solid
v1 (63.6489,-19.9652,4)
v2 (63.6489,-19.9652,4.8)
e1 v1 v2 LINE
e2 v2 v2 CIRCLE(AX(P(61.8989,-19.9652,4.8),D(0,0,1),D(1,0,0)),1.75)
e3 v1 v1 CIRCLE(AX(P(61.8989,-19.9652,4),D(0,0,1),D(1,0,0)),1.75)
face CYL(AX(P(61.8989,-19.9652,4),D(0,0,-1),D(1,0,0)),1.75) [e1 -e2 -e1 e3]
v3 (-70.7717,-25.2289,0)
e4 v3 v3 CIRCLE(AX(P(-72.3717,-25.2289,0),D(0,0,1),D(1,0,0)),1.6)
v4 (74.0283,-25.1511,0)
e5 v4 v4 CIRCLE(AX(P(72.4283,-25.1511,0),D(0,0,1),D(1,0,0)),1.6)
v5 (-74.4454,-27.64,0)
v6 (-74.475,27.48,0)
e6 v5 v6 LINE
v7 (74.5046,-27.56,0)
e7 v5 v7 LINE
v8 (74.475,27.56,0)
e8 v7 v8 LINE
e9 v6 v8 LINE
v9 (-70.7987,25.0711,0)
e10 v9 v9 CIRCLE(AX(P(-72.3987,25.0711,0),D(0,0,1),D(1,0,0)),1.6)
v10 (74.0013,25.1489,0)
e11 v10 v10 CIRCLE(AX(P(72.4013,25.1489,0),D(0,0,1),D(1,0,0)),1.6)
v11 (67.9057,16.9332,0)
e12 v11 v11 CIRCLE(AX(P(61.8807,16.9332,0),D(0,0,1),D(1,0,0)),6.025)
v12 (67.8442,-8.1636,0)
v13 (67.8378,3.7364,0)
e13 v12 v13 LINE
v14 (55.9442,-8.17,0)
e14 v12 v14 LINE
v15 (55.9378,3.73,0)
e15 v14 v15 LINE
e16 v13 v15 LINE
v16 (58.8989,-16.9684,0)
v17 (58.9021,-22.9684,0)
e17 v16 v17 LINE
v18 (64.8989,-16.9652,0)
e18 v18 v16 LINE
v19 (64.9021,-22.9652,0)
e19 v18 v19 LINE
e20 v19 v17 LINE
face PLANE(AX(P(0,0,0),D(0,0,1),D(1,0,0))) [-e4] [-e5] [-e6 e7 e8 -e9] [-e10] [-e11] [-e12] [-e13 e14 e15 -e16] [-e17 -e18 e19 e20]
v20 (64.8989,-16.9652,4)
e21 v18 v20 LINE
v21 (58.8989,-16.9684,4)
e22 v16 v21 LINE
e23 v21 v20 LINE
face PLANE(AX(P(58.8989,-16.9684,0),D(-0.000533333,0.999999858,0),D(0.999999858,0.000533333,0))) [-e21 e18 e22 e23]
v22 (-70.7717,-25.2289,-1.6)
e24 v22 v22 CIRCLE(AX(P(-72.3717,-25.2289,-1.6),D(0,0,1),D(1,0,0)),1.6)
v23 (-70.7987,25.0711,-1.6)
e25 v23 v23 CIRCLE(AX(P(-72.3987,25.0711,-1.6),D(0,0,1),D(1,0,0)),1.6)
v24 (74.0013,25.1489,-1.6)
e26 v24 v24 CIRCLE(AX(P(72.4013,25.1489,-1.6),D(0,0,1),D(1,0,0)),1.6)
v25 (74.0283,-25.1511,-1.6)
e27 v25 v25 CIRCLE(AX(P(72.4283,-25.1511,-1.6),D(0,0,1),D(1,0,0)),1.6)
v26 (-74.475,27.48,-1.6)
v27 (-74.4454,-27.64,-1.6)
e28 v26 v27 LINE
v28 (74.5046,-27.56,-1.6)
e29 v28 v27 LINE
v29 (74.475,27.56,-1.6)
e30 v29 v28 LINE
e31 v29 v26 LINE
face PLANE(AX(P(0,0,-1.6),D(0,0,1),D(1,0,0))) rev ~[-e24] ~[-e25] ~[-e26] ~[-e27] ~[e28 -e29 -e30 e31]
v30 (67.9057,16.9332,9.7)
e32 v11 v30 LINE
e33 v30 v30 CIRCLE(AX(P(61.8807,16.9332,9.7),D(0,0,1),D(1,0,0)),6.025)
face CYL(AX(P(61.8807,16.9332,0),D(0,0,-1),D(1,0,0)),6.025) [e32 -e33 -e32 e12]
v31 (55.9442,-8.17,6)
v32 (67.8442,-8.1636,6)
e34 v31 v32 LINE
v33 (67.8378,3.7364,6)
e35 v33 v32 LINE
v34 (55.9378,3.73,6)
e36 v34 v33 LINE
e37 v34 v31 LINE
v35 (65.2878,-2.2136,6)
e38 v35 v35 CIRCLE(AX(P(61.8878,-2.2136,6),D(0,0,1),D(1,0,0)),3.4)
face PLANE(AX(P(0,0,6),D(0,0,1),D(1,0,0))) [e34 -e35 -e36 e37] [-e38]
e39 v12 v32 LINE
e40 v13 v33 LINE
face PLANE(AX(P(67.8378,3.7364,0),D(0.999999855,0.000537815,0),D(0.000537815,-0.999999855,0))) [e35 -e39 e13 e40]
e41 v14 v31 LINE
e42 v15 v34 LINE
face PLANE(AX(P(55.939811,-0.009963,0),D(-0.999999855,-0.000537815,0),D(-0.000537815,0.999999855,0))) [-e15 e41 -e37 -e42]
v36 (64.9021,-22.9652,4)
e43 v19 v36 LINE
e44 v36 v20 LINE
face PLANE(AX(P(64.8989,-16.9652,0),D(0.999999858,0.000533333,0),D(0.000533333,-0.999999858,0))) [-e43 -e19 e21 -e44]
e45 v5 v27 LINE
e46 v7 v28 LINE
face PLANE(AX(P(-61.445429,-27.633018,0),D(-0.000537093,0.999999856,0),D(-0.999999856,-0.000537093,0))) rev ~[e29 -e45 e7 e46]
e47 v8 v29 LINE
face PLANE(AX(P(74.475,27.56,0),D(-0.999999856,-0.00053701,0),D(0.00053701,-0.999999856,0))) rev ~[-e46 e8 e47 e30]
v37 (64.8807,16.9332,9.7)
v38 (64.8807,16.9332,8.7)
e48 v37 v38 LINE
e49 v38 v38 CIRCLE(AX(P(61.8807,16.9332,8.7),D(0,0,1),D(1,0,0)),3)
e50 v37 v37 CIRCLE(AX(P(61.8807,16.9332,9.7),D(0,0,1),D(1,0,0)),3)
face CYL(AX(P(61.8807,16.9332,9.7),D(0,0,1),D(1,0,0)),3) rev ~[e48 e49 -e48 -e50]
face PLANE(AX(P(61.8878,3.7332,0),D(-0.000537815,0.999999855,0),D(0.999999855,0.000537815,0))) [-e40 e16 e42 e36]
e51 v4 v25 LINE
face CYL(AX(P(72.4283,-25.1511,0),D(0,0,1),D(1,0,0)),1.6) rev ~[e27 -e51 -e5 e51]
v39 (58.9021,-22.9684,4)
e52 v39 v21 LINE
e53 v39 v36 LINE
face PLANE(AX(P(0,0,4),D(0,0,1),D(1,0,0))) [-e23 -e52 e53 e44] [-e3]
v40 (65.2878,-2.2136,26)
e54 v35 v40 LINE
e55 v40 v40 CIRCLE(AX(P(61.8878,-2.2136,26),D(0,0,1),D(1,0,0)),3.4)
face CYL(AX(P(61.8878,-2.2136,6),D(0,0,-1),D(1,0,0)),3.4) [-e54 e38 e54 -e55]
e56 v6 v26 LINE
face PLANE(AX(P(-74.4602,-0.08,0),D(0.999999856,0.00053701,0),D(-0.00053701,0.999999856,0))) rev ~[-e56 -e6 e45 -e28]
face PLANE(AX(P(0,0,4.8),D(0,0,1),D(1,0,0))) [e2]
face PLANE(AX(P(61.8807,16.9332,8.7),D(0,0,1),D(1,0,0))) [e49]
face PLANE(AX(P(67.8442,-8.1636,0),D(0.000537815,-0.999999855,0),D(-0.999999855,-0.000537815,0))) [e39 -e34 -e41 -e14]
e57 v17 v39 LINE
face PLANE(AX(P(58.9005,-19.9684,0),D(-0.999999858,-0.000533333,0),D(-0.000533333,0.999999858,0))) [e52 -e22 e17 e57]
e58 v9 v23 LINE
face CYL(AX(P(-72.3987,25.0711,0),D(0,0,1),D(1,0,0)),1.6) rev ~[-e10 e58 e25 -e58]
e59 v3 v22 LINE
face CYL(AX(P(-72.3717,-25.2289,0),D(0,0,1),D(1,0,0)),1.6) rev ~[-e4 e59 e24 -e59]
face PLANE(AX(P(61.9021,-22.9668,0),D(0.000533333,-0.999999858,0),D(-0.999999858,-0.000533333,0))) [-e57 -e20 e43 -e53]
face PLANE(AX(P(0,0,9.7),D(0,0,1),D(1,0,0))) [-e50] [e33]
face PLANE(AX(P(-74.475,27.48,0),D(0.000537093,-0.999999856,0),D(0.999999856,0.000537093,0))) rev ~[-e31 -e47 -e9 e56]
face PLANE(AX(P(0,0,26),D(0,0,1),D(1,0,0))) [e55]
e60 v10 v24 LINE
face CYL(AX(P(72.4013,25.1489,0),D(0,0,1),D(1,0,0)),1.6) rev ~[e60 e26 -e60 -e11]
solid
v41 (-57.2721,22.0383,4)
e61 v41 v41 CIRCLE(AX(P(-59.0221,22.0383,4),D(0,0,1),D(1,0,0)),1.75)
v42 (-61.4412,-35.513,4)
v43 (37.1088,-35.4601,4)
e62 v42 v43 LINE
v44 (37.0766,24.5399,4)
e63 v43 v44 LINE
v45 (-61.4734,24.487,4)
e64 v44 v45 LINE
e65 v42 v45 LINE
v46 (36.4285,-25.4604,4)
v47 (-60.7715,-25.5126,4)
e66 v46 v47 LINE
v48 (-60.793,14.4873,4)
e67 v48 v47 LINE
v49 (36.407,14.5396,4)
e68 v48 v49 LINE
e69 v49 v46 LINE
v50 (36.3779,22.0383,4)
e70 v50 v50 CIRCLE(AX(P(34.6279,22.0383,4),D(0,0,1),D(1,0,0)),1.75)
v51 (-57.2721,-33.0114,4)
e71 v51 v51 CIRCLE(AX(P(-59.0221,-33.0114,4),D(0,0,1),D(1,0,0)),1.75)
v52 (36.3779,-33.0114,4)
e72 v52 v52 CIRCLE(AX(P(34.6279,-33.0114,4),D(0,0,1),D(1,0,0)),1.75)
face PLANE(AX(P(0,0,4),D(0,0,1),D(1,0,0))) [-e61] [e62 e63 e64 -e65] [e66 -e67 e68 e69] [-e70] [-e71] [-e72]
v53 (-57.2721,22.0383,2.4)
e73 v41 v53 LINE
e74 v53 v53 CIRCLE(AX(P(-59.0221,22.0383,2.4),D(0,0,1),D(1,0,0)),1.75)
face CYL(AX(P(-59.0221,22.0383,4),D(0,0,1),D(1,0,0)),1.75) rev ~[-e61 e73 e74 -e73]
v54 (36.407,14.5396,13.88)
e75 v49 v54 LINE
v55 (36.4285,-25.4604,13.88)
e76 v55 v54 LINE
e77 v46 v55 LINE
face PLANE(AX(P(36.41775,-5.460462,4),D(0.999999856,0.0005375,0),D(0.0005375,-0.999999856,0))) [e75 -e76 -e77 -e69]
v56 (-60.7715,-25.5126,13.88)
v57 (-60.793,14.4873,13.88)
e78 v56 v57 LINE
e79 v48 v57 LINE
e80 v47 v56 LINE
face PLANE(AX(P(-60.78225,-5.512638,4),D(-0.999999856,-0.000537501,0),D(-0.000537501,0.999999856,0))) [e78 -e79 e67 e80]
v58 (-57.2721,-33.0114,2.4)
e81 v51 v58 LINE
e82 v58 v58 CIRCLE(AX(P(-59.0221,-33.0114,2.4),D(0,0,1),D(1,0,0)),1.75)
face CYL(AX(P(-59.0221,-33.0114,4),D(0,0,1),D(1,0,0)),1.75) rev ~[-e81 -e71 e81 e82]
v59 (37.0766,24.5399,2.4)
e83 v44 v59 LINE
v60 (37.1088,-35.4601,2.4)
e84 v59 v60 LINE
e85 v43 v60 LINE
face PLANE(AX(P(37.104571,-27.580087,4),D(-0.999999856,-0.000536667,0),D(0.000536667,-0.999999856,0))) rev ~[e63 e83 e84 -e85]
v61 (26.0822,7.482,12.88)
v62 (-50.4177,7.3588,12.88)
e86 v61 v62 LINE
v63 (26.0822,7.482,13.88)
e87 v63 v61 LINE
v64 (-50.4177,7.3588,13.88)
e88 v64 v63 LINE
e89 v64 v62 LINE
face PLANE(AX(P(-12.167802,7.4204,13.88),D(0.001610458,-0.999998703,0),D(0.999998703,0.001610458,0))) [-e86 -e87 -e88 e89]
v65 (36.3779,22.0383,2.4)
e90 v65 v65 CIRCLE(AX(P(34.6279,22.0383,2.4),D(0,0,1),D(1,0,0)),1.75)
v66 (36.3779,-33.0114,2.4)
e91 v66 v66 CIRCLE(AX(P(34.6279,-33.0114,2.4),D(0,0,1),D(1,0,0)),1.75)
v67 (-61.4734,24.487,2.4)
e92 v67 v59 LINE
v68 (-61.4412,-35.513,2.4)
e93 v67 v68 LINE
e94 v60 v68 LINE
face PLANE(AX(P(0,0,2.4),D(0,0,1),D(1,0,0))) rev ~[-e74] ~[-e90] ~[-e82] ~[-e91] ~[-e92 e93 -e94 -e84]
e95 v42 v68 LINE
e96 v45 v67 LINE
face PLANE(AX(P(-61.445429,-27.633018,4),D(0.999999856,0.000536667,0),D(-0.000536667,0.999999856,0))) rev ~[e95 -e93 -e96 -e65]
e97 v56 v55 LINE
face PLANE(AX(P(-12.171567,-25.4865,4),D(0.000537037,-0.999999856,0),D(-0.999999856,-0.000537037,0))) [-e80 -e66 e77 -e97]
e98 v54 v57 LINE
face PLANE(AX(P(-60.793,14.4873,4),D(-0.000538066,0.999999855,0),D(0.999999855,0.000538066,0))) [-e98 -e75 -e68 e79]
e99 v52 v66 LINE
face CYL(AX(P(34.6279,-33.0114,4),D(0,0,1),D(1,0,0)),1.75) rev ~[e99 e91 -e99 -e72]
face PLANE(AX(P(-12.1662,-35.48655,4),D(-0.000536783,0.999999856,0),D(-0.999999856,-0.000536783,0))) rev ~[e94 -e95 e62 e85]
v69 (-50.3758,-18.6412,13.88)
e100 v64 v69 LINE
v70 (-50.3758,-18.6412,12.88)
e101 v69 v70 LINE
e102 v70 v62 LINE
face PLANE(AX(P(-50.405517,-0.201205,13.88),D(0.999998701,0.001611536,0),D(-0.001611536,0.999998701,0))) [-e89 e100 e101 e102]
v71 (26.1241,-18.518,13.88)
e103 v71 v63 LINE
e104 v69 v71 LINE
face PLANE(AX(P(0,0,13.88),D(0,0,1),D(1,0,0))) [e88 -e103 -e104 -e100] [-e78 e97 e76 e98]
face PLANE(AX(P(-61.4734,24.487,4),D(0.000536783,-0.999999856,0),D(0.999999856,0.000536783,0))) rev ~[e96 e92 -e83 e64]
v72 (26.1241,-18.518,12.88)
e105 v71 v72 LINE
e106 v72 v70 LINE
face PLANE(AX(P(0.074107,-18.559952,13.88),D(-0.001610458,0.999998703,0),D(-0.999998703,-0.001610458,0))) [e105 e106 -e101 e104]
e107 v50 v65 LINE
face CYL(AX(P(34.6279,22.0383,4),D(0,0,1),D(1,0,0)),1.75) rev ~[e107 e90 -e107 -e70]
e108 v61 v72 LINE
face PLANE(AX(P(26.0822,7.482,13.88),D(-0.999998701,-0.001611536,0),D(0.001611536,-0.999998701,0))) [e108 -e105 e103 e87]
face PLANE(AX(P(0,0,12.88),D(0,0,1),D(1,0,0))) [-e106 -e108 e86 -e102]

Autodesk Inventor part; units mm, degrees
ref_plane "YZ Plane" through (0, 0, 0) normal (1, 0, 0) x (0, 1, 0)
ref_plane "XZ Plane" through (0, 0, 0) normal (0, 1, 0) x (-1, 0, 0)
sketch "LCD Screen" plane through (0, 0, 0) normal (0, 0, 1) x (1, 0, 0)
  line L0 (-74.575, 27.52) -> (74.375, 27.52)
  line L1 (74.375, 27.52) -> (74.375, -27.6)
  line L2 (74.375, -27.6) -> (-74.575, -27.6)
  line L3 (-74.575, -27.6) -> (-74.575, 27.52)
  circle A0 centre (-72.5, 25.11) radius 1.6
  circle A1 centre (72.3, 25.11) radius 1.6
  circle A2 centre (72.3, -25.19) radius 1.6
  circle A3 centre (-72.5, -25.19) radius 1.6
  circle A4 centre (61.775, 16.9) radius 6.025
  line L4 (55.825, 3.7) -> (67.725, 3.7)
  line L5 (67.725, 3.7) -> (67.725, -8.2)
  line L6 (67.725, -8.2) -> (55.825, -8.2)
  line L7 (55.825, -8.2) -> (55.825, 3.7)
  line L8 (58.775, -17) -> (64.775, -17)
  line L9 (64.775, -17) -> (64.775, -23)
  line L10 (64.775, -23) -> (58.775, -23)
  line L11 (58.775, -23) -> (58.775, -17)
  line L12 (-61.575, 24.52) -> (36.975, 24.52)
  line L13 (36.975, 24.52) -> (36.975, -35.48)
  line L14 (36.975, -35.48) -> (-61.575, -35.48)
  line L15 (-61.575, -35.48) -> (-61.575, 24.52)
  line L16 (-60.9, 14.52) -> (36.3, 14.52)
  line L17 (36.3, 14.52) -> (36.3, -25.48)
  line L18 (36.3, -25.48) -> (-60.9, -25.48)
  line L19 (-60.9, -25.48) -> (-60.9, 14.52)
  line L20 (-50.55, 7.52) -> (25.95, 7.52)
  line L21 (25.95, 7.52) -> (25.95, -18.48)
  line L22 (25.95, -18.48) -> (-50.55, -18.48)
  line L23 (-50.55, -18.48) -> (-50.55, 7.52)
  line L24 (-74.575, -0.04) -> (74.375, -0.04)
  line L25 (-0.1, 27.52) -> (-0.1, -27.6)
  line L26 (55.825, -2.25) -> (67.725, -2.25)
  line L27 (61.775, 3.7) -> (61.775, -8.2)
  line L28 (61.775, -17) -> (61.775, -23)
  line L29 (58.775, -20) -> (64.775, -20)
  line L30 (-12.3, 24.52) -> (-12.3, -35.48)
  line L31 (-61.575, -5.48) -> (36.975, -5.48)
  point P0 (14.168, -4.3108)
  point P1 (-12.3, 7.52)
  point P2 (-12.3, 14.52)
  point P3 (-50.55, -5.48)
  point P4 (-60.9, -5.48)
  point P5 (61.775, -2.25)
  point P6 (61.775, -2.25)
  point P7 (61.775, -20)
  dimension "d0" = 148.95
  dimension "d1" = 55.12
  dimension "d2" = 3.2
  dimension "d3" = 3.2
  dimension "d4" = 3.2
  dimension "d5" = 3.2
  dimension "d11" = 12.05
  dimension "d14" = 11.9
  dimension "d15" = 11.9
  dimension "d17" = 6
  dimension "d18" = 6
  dimension "d21" = 60
  dimension "d23" = 13
  dimension "d24" = 97.2
  dimension "d25" = 40
  dimension "d27" = 26
  dimension "d28" = 76.5
  dimension "d59" = 50.3
  dimension "d60" = 25.15
  dimension "d61" = 144.8
  dimension "d62" = 72.4
  dimension "d63" = 13.2
  dimension "d64" = 8.8
  dimension "d65" = 9.6
  dimension "d66" = 3
  dimension "d67" = 10
  dimension "d68" = 4.6
sketch "Sketch1" plane through (0, 0, 0) normal (0, 0, 1) x (1, 0, 0)
  line L0 (-74.475, 27.48) -> (74.475, 27.56)
  line L1 (74.475, 27.56) -> (74.5046, -27.56)
  line L2 (74.5046, -27.56) -> (-74.4454, -27.64)
  line L3 (-74.4454, -27.64) -> (-74.475, 27.48)
  circle A0 centre (-72.3987, 25.0711) radius 1.6
  circle A1 centre (72.4013, 25.1489) radius 1.6
  circle A2 centre (72.4283, -25.1511) radius 1.6
  circle A3 centre (-72.3717, -25.2289) radius 1.6
  circle A4 centre (61.8807, 16.9332) radius 6.025
  line L4 (55.9378, 3.73) -> (67.8378, 3.7364)
  line L5 (67.8378, 3.7364) -> (67.8442, -8.1636)
  line L6 (67.8442, -8.1636) -> (55.9442, -8.17)
  line L7 (55.9442, -8.17) -> (55.9378, 3.73)
  line L8 (58.8989, -16.9684) -> (64.8989, -16.9652)
  line L9 (64.8989, -16.9652) -> (64.9021, -22.9652)
  line L10 (64.9021, -22.9652) -> (58.9021, -22.9684)
  line L11 (58.9021, -22.9684) -> (58.8989, -16.9684)
  line L12 (-61.4734, 24.487) -> (37.0766, 24.5399)
  line L13 (37.0766, 24.5399) -> (37.1088, -35.4601)
  line L14 (37.1088, -35.4601) -> (-61.4412, -35.513)
  line L15 (-61.4412, -35.513) -> (-61.4734, 24.487)
  line L16 (-60.793, 14.4873) -> (36.407, 14.5396)
  line L17 (36.407, 14.5396) -> (36.4285, -25.4604)
  line L18 (36.4285, -25.4604) -> (-60.7715, -25.5126)
  line L19 (-60.7715, -25.5126) -> (-60.793, 14.4873)
  line L20 (-50.4393, 7.4929) -> (26.0607, 7.534)
  line L21 (26.0607, 7.534) -> (26.0747, -18.466)
  line L22 (26.0747, -18.466) -> (-50.4253, -18.5071)
  line L23 (-50.4253, -18.5071) -> (-50.4393, 7.4929)
  line L24 (-74.4602, -0.08) -> (74.4898, 0)
  line L25 (0, 27.52) -> (0.0296, -27.6)
  line L26 (55.941, -2.22) -> (67.841, -2.2136)
  line L27 (61.8878, 3.7332) -> (61.8942, -8.1668)
  line L28 (61.8989, -16.9668) -> (61.9021, -22.9668)
  line L29 (58.9005, -19.9684) -> (64.9005, -19.9652)
  line L30 (-12.1984, 24.5134) -> (-12.1662, -35.4865)
  line L31 (-61.4573, -5.513) -> (37.0927, -5.4601)
  point P0 (0, 0)
extrude "Extrusion1" add sketch "Sketch1" against normal blind 1.6 contours L0 L25 L12 L15 L24 L3 | L0 L1 L24 L5 L4 L7 L13 L12 L25 | L24 L15 L2 L3 | L25 L16 L30 L12 | L12 L13 L24 L17 L16 L25 | L24 L19 L31 L15 | L15 L12 L30 L16 L19 L24 | L1 L2 L13 L24 L7 L6 L5 | L25 L20 L30 L16 | L16 L17 L24 L21 L20 L25 | L15 L31 L19 L18 L30 L2 | L24 L23 L31 L19 | L19 L16 L30 L20 L23 L24 | L24 L27 L4 L5 | L5 L26 L27 L24 | L13 L31 L17 L24 | L25 L24 L30 L20 | L20 L21 L24 L25 | L30 L18 L25 L2 | L31 L23 L22 L30 L18 L19 | L24 L30 L31 L23 | L23 L20 L30 L24 | L2 L25 L18 L17 L31 L13 | L5 L6 L27 L26 | L27 L26 L7 L24 | L24 L7 L4 L27 | L17 L31 L21 L24 | L25 L31 L30 L24 | L24 L21 L31 L25 | L30 L22 L25 L18 | L31 L30 L22 L23 | L27 L6 L7 L26 | L17 L18 L25 L22 L21 L31 | L31 L21 L22 L25 | L25 L22 L30 L31 | A4 | L8 L28 L29 L11 | L8 L9 L29 L28 | L29 L28 L10 L11 | L29 L9 L10 L28
extrude "Extrusion2" add sketch "Sketch1" along normal blind 9.7 contours A4
ref_plane "Work Plane1" through (0, 0, 4) normal (0, 0, 1) x (1, 0, 0)
sketch "Sketch2" plane through (0, 0, 4) normal (0, 0, 1) x (1, 0, 0)
  line L0 (-74.4454, -27.64) -> (-74.475, 27.48) projected
  line L1 (-74.475, 27.48) -> (74.475, 27.56) projected
  line L2 (-74.475, 27.48) -> (74.475, 27.56)
  line L3 (74.475, 27.56) -> (74.5046, -27.56)
  line L4 (74.5046, -27.56) -> (-74.4454, -27.64)
  line L5 (-74.4454, -27.64) -> (-74.475, 27.48)
  circle A0 centre (-72.3987, 25.0711) radius 1.6
  circle A1 centre (72.4013, 25.1489) radius 1.6
  circle A2 centre (72.4283, -25.1511) radius 1.6
  circle A3 centre (-72.3717, -25.2289) radius 1.6
  circle A4 centre (61.8807, 16.9332) radius 6.025
  line L6 (55.9378, 3.73) -> (67.8378, 3.7364)
  line L7 (67.8378, 3.7364) -> (67.8442, -8.1636)
  line L8 (67.8442, -8.1636) -> (55.9442, -8.17)
  line L9 (55.9442, -8.17) -> (55.9378, 3.73)
  line L10 (58.8989, -16.9684) -> (64.8989, -16.9652)
  line L11 (64.8989, -16.9652) -> (64.9021, -22.9652)
  line L12 (64.9021, -22.9652) -> (58.9021, -22.9684)
  line L13 (58.9021, -22.9684) -> (58.8989, -16.9684)
  line L14 (-61.4734, 24.487) -> (37.0766, 24.5399)
  line L15 (37.0766, 24.5399) -> (37.1088, -35.4601)
  line L16 (37.1088, -35.4601) -> (-61.4412, -35.513)
  line L17 (-61.4412, -35.513) -> (-61.4734, 24.487)
  line L18 (-60.793, 14.4873) -> (36.407, 14.5396)
  line L19 (36.407, 14.5396) -> (36.4285, -25.4604)
  line L20 (36.4285, -25.4604) -> (-60.7715, -25.5126)
  line L21 (-60.7715, -25.5126) -> (-60.793, 14.4873)
  line L22 (-50.4393, 7.4929) -> (26.0607, 7.534)
  line L23 (26.0607, 7.534) -> (26.0747, -18.466)
  line L24 (26.0747, -18.466) -> (-50.4253, -18.5071)
  line L25 (-50.4253, -18.5071) -> (-50.4393, 7.4929)
  line L26 (-74.4602, -0.08) -> (74.4898, 0)
  line L27 (0, 27.52) -> (0.0296, -27.6)
  line L28 (55.941, -2.22) -> (67.841, -2.2136)
  line L29 (61.8878, 3.7332) -> (61.8942, -8.1668)
  line L30 (61.8989, -16.9668) -> (61.9021, -22.9668)
  line L31 (58.9005, -19.9684) -> (64.9005, -19.9652)
  line L32 (-12.1984, 24.5134) -> (-12.1662, -35.4865)
  line L33 (-61.4573, -5.513) -> (37.0927, -5.4601)
  point P0 (0, 0)
extrude "Extrusion3" add sketch "Sketch2" against normal blind 1.6 contours L17 L33 L21 L20 L32 L4 | L4 L32 L16 L17 | L26 L21 L33 L17 | L17 L14 L32 L18 L21 L26 | L32 L20 L27 L4 | L4 L15 L16 L32 | L26 L25 L33 L21 | L21 L18 L32 L22 L25 L26 | L27 L20 L19 L33 L15 L4 | L32 L24 L27 L20 | L20 L21 L33 L25 L24 L32 | L27 L18 L32 L14 | L14 L15 L26 L19 L18 L27 | L26 L32 L33 L25 | L25 L22 L32 L26 | L27 L24 L23 L33 L19 L20 | L32 L33 L27 L24 | L24 L25 L33 L32 | L27 L22 L32 L18 | L18 L19 L26 L23 L22 L27 | L32 L22 L27 L26 | L26 L27 L33 L32 | L33 L19 L26 L15 | L27 L33 L23 L24 | L22 L23 L26 L27 | L26 L23 L33 L27 | L33 L23 L26 L19
extrude "Extrusion4" add sketch "Sketch2" along normal blind 9.88 contours L26 L25 L33 L21 | L21 L18 L32 L22 L25 L26 | L32 L24 L27 L20 | L20 L21 L33 L25 L24 L32 | L26 L32 L33 L25 | L25 L22 L32 L26 | L27 L24 L23 L33 L19 L20 | L32 L33 L27 L24 | L24 L25 L33 L32 | L27 L22 L32 L18 | L18 L19 L26 L23 L22 L27 | L32 L22 L27 L26 | L26 L27 L33 L32 | L27 L33 L23 L24 | L22 L23 L26 L27 | L26 L23 L33 L27 | L33 L23 L26 L19
sketch "Sketch3" plane through (0, 0, 13.88) normal (0, 0, 1) x (1, 0, 0)
  line L0 (74.475, 27.56) -> (74.5046, -27.56) projected
  line L1 (-74.475, 27.48) -> (74.475, 27.56) projected
  line L2 (-74.4749, 27.32) -> (74.4749, 27.56)
  line L3 (74.4749, 27.56) -> (74.5637, -27.56)
  line L4 (74.5637, -27.56) -> (-74.3861, -27.7999)
  line L5 (-74.3861, -27.7999) -> (-74.4749, 27.32)
  circle A0 centre (-72.396, 24.9134) radius 1.6
  circle A1 centre (72.4038, 25.1466) radius 1.6
  circle A2 centre (72.4848, -25.1533) radius 1.6
  circle A3 centre (-72.315, -25.3866) radius 1.6
  circle A4 centre (61.892, 16.9197) radius 6.025
  line L6 (55.9633, 3.7101) -> (67.8633, 3.7293)
  line L7 (67.8633, 3.7293) -> (67.8824, -8.1707)
  line L8 (67.8824, -8.1707) -> (55.9825, -8.1899)
  line L9 (55.9825, -8.1899) -> (55.9633, 3.7101)
  line L10 (58.9466, -16.9851) -> (64.9466, -16.9754)
  line L11 (64.9466, -16.9754) -> (64.9563, -22.9754)
  line L12 (64.9563, -22.9754) -> (58.9563, -22.9851)
  line L13 (58.9563, -22.9851) -> (58.9466, -16.9851)
  line L14 (-61.4701, 24.341) -> (37.0798, 24.4997)
  line L15 (37.0798, 24.4997) -> (37.1764, -35.5002)
  line L16 (37.1764, -35.5002) -> (-61.3734, -35.6589)
  line L17 (-61.3734, -35.6589) -> (-61.4701, 24.341)
  line L18 (-60.779, 14.3421) -> (36.4209, 14.4986)
  line L19 (36.4209, 14.4986) -> (36.4853, -25.5013)
  line L20 (36.4853, -25.5013) -> (-60.7145, -25.6579)
  line L21 (-60.7145, -25.6579) -> (-60.779, 14.3421)
  line L22 (-50.4177, 7.3588) -> (26.0822, 7.482)
  line L23 (26.0822, 7.482) -> (26.1241, -18.518)
  line L24 (26.1241, -18.518) -> (-50.3758, -18.6412)
  line L25 (-50.3758, -18.6412) -> (-50.4177, 7.3588)
  line L26 (-74.4305, -0.2399) -> (74.5193, 0)
  line L27 (0, 27.44) -> (0.0888, -27.6799)
  line L28 (55.9729, -2.2399) -> (67.8729, -2.2207)
  line L29 (61.9133, 3.7197) -> (61.9325, -8.1803)
  line L30 (61.9466, -16.9803) -> (61.9563, -22.9803)
  line L31 (58.9515, -19.9851) -> (64.9515, -19.9754)
  line L32 (-12.1952, 24.4204) -> (-12.0985, -35.5796)
  line L33 (-61.4218, -5.659) -> (37.1281, -5.5002)
  point P0 (0, 0)
  point P1 (74.4898, 0)
  point P2 (0, 27.52)
extrude "Extrusion5" cut sketch "Sketch3" against normal blind 1 contours L27 L26 L32 L22 | L22 L23 L26 L27 | L32 L26 L25 L22 | L27 L33 L32 L26 | L26 L23 L33 L27 | L27 L33 L23 L24 | L24 L32 L33 L27 | L26 L32 L33 L25 | L24 L25 L33 L32
sketch "Sketch4" plane through (0, 0, 4) normal (0, 0, 1) x (1, 0, 0)
  circle A0 centre (-59.0221, 22.0383) radius 1.75
  circle A1 centre (34.6279, 22.0383) radius 1.75
  circle A2 centre (-59.0221, -33.0114) radius 1.75
  circle A3 centre (34.6279, -33.0114) radius 1.75
  line L0 (-61.4734, 24.487) -> (37.0766, 24.5399) projected
  line L1 (-61.4412, -35.513) -> (-61.4734, 24.487) projected
  line L2 (37.1088, -35.4601) -> (-61.4412, -35.513) projected
  line L3 (37.0766, 24.5399) -> (37.1088, -35.4601) projected
  point P0 (0, 0)
  dimension "d40" = 3.5
  dimension "d42" = 2.45
  dimension "d43" = 2.45
  dimension "d44" = 2.45
  dimension "d45" = 2.45
extrude "Extrusion6" cut sketch "Sketch4" against normal blind 2 contours A0 | A1 | A2 | A3
extrude "Extrusion7" add sketch "Sketch1" along normal blind 6 contours L24 L27 L4 L5 | L5 L26 L27 L24 | L5 L6 L27 L26 | L27 L26 L7 L24 | L24 L7 L4 L27 | L27 L6 L7 L26
extrude "Extrusion8" add sketch "Sketch1" along normal blind 4 contours L8 L28 L29 L11 | L8 L9 L29 L28 | L29 L28 L10 L11 | L29 L9 L10 L28
sketch "Sketch5" plane through (0, 0, 6) normal (0, 0, 1) x (1, 0, 0)
  circle A0 centre (61.8878, -2.2136) radius 3.4
  line L0 (67.8442, -8.1636) -> (67.8378, 3.7364) projected
  line L1 (67.8378, 3.7364) -> (55.9378, 3.73) projected
  point P0 (0, 0)
  point P1 (67.841, -2.2136)
  point P2 (61.8878, 3.7332)
  dimension "d52" = 6.8
extrude "Extrusion9" add sketch "Sketch5" along normal blind 20
sketch "Sketch6" plane through (0, 0, 4) normal (0, 0, 1) x (1, 0, 0)
  circle A0 centre (61.8989, -19.9652) radius 1.75
  line L0 (64.8989, -16.9652) -> (58.8989, -16.9684) projected
  line L1 (64.9021, -22.9652) -> (64.8989, -16.9652) projected
  point P0 (0, 0)
  point P1 (61.8989, -16.9668)
  point P2 (64.9005, -19.9652)
  dimension "d55" = 3.5
extrude "Extrusion10" add sketch "Sketch6" along normal blind 0.8
sketch "Sketch7" plane through (61.8807, 16.9332, 9.7) normal (0, 0, 1) x (1, 0, 0)
  circle A0 centre (0, 0) radius 3
  point P0 (-61.8807, -16.9332)
  dimension "d69" = 6
extrude "Extrusion11" cut sketch "Sketch7" against normal blind 1
equation "\"d60\" = 0.5 * d59"
equation "\"d62\" = 0.5 * d61"
equation "\"d43\" = d42"
equation "\"d44\" = d43"
equation "\"d45\" = d43"
properties part number "2004A LCD Module"
